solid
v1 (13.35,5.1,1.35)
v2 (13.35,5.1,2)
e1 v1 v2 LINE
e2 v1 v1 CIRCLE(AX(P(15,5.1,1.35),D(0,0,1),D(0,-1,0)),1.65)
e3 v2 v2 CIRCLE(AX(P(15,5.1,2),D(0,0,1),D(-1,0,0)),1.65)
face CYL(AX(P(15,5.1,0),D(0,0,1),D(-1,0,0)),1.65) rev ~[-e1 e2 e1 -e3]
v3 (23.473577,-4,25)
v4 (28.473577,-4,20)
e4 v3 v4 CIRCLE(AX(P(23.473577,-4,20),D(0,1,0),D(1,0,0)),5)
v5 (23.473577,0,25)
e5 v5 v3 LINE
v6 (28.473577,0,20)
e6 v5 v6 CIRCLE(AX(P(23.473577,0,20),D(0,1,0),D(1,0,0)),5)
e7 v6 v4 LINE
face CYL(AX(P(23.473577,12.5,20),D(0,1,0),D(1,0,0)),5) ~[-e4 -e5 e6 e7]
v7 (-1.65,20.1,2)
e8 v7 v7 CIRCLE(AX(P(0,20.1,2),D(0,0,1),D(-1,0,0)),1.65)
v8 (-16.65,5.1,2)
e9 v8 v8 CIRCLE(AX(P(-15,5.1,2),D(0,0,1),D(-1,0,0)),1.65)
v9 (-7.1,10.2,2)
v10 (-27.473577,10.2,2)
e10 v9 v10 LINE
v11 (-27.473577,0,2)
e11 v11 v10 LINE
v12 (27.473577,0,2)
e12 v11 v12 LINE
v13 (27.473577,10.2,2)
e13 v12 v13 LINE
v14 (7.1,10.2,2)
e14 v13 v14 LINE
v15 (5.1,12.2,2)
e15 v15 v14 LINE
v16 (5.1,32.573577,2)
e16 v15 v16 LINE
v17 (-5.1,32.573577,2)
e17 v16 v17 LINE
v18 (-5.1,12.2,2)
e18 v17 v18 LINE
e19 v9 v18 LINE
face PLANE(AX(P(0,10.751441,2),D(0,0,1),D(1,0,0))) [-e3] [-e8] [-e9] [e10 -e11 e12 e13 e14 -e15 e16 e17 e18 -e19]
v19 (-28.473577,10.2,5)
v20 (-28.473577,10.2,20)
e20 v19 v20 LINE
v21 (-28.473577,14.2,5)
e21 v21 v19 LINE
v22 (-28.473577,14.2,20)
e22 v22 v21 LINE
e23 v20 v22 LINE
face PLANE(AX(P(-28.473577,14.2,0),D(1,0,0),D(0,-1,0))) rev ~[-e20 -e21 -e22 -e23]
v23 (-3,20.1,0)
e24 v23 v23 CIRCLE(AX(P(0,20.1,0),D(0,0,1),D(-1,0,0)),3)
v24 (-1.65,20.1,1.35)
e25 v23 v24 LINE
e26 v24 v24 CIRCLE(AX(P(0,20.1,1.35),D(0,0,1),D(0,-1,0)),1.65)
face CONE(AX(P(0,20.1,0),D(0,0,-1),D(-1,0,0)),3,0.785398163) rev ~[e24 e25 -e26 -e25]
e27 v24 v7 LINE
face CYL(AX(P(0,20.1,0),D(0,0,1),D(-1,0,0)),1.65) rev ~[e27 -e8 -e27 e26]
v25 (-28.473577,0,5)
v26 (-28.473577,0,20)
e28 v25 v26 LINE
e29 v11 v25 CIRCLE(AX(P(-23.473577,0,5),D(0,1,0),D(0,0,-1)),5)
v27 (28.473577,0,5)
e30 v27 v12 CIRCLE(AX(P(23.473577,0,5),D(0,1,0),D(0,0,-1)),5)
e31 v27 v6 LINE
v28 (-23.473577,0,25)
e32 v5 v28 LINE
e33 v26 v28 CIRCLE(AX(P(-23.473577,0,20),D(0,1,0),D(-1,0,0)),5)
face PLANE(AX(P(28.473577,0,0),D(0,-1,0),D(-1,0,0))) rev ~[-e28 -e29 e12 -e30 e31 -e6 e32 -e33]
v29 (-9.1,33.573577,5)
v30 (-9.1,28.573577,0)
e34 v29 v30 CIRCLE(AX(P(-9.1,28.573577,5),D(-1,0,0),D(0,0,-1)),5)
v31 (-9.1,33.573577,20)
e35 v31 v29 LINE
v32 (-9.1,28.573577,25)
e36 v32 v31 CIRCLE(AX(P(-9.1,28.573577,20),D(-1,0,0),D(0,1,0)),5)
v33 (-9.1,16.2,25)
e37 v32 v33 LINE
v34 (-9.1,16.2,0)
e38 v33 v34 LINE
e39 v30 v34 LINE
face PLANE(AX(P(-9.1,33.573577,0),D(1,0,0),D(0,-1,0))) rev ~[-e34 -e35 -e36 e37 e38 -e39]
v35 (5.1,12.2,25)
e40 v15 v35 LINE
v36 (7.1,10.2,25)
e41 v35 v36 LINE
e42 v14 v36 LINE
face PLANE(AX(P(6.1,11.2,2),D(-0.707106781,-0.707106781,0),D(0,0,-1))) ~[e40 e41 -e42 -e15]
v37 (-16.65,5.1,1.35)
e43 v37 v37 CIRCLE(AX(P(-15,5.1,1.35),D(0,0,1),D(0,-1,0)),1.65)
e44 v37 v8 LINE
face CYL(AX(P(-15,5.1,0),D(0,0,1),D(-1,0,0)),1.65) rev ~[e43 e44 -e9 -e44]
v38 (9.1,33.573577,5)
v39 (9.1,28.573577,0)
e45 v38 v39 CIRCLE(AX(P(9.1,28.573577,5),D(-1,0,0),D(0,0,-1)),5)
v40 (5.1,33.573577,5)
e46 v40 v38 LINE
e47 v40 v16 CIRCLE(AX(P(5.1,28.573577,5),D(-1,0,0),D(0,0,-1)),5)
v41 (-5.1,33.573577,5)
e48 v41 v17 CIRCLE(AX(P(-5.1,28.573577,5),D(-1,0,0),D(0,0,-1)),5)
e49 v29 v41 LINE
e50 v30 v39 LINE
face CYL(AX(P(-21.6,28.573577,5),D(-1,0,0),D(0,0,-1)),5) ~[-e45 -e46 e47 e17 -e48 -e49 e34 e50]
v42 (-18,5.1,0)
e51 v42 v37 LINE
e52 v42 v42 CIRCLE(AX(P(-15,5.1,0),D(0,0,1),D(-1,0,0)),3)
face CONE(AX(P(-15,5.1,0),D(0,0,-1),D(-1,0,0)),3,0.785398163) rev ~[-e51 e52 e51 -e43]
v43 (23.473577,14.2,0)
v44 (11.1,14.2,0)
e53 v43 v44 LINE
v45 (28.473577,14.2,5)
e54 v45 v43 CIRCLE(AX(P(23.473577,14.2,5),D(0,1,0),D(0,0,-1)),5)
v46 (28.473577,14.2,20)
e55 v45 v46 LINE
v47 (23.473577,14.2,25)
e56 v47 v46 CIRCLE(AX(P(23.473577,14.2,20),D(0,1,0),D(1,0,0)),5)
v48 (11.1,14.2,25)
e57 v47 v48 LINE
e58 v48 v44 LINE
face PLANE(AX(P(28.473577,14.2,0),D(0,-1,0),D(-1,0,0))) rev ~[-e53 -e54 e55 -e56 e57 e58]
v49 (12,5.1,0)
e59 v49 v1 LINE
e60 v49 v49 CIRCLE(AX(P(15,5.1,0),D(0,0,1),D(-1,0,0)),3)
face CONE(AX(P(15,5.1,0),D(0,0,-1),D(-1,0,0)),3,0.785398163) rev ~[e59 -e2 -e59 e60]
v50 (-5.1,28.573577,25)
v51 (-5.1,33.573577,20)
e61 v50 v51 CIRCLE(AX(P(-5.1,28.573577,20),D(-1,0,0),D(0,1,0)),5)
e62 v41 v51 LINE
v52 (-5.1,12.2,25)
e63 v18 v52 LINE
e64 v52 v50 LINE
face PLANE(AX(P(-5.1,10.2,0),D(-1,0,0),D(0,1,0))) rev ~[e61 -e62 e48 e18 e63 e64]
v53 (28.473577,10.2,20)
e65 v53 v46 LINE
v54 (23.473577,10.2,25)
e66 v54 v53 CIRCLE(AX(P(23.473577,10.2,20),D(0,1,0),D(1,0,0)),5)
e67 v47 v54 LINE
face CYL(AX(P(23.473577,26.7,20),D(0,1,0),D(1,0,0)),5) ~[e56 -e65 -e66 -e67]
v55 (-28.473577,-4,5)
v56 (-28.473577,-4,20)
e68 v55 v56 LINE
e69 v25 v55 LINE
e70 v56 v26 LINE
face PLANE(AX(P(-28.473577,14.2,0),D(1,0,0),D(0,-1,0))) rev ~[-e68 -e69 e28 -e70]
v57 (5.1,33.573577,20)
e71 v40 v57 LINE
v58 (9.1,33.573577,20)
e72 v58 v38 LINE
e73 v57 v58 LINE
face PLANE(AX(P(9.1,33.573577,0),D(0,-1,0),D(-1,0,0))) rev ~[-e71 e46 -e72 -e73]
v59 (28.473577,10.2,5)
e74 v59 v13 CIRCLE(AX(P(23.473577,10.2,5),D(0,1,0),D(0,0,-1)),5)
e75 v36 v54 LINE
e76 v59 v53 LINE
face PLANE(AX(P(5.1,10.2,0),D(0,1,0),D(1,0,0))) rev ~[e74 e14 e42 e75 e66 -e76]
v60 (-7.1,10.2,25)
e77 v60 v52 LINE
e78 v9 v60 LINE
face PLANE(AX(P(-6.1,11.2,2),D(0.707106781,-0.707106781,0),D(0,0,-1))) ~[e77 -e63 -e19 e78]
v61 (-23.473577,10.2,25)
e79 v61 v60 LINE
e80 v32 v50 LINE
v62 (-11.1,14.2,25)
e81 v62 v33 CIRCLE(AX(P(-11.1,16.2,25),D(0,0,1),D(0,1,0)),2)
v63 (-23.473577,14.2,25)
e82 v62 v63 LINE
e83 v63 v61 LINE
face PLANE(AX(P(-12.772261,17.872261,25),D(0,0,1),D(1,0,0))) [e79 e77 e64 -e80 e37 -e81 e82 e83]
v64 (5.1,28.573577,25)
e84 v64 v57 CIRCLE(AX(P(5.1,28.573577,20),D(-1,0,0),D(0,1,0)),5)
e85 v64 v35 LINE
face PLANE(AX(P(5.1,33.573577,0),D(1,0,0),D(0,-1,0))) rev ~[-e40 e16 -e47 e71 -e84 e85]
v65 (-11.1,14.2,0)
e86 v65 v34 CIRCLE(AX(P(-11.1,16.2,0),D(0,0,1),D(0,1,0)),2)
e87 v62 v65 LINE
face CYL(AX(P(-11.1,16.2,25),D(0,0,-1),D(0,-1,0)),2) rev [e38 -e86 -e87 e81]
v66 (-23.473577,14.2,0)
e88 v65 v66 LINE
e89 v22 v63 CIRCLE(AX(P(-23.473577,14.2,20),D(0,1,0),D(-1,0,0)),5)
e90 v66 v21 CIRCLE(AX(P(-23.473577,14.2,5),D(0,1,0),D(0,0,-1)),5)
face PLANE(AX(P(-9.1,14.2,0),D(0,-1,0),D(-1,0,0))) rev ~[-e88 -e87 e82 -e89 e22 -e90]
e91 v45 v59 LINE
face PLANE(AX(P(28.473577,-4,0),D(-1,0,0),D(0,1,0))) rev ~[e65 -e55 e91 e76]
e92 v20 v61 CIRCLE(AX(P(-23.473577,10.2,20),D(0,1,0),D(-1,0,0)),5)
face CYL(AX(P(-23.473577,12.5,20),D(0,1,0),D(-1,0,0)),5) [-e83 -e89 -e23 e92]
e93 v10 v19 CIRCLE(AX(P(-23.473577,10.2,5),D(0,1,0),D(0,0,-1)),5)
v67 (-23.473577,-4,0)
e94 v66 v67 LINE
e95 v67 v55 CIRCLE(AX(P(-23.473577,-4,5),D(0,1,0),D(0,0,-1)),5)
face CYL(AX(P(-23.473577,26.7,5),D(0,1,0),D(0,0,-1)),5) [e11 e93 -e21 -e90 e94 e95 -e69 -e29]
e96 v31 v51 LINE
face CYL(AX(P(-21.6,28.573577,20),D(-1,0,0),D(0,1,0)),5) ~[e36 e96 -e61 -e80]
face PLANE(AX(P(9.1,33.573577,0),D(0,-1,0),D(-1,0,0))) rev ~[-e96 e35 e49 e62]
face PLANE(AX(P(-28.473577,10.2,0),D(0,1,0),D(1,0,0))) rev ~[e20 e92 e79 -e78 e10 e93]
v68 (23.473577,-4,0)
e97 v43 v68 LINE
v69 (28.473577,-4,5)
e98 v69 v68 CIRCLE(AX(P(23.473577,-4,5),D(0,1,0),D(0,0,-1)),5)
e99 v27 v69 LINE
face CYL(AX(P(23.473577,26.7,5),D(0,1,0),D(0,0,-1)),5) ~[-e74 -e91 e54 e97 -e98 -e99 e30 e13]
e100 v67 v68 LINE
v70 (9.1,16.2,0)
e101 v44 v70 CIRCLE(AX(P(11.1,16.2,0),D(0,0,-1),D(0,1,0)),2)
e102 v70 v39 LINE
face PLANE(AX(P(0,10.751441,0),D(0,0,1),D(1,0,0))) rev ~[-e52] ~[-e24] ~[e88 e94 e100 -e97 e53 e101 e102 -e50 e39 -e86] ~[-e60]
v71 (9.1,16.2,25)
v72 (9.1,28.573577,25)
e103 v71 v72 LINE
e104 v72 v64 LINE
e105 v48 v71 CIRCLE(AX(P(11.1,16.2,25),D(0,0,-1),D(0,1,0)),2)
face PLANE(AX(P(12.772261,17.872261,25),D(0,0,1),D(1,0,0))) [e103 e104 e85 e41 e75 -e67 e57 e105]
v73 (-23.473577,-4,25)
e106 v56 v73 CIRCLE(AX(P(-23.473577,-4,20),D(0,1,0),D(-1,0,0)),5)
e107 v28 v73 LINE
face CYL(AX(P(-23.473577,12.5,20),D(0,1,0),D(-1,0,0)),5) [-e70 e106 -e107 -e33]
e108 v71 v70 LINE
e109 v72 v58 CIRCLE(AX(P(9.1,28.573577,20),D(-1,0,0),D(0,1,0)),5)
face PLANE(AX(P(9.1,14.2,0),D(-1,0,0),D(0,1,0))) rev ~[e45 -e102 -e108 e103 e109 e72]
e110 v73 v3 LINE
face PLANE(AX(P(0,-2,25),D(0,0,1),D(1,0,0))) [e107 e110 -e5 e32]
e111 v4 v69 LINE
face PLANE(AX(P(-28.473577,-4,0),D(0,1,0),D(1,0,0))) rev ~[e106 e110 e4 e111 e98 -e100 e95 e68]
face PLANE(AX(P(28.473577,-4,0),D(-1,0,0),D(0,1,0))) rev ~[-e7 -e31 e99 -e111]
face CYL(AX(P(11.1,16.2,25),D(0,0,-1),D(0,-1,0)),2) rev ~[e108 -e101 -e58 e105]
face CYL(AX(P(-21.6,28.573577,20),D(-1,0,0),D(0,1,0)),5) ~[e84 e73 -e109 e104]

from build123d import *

# Parameters (mm, degrees)
F1_DEPTH       = 2
F2_DEPTH       = 25
F3_R           = 2
F4_T1_DEPTH    = 29
F4_T3_DEPTH    = 29
F4_T5_DEPTH    = 29
F4_T7_DEPTH    = 29
F4_T9_DEPTH    = 43.2
F4_T11_DEPTH   = 43.2
F5_R           = 2
F6_SIZE        = 2
F8_D           = 3.3
F8_CSINK_D     = 6
F8_CSINK_ANGLE = 90


# Not quite as in the source:
# - a fillet or chamfer that OpenCascade refuses, or shapes differently, is made with other operations: its cross-section is extruded or revolved along the edge and cut away or added


with BuildPart() as f1:
    # F0 (on Top) → F1 (new body)
    with BuildSketch(Plane.XY):
        Polygon((-28.4735770881, 0), (0, 0), (28.4735770881, 0), (28.4735770881, 10.2), (5.1, 10.2), (5.1, 33.5735770881), (-5.1, 33.5735770881), (-5.1, 10.2), (-28.4735770881, 10.2), align=None)
        Polygon((28.4735770881, 0), (0, 0), (-28.4735770881, 0), (-28.4735770881, -4), (0, -4), (28.4735770881, -4), align=None)
        Polygon((5.1, 10.2), (28.4735770881, 10.2), (28.4735770881, 14.2), (9.1, 14.2), (9.1, 33.5735770881), (5.1, 33.5735770881), align=None)
        Polygon((-28.4735770881, 14.2), (-28.4735770881, 10.2), (-5.1, 10.2), (-5.1, 33.5735770881), (-9.1, 33.5735770881), (-9.1, 14.2), align=None)
    extrude(amount=F1_DEPTH)

    # F0 (on Top) → F2 (join)
    with BuildSketch(Plane.XY):
        Polygon((-28.4735770881, 14.2), (-28.4735770881, 10.2), (-5.1, 10.2), (-5.1, 33.5735770881), (-9.1, 33.5735770881), (-9.1, 14.2), align=None)
        Polygon((5.1, 10.2), (28.4735770881, 10.2), (28.4735770881, 14.2), (9.1, 14.2), (9.1, 33.5735770881), (5.1, 33.5735770881), align=None)
        Polygon((28.4735770881, 0), (0, 0), (-28.4735770881, 0), (-28.4735770881, -4), (0, -4), (28.4735770881, -4), align=None)
    extrude(amount=F2_DEPTH)

    # F3
    f3_edges = [f1.edges().sort_by_distance(p)[0] for p in [
        (9.1, 14.2, 12.5),
    ]]
    fillet(f3_edges, radius=F3_R)

    # F4: fillet of radius 5 on 9 edges, made by hand

    # F4_s2 → F4_t1 (cut)
    with BuildSketch(Plane.XZ.offset(-12.5)):
        with BuildLine():
            ThreePointArc((28.4735770881, 20), (27.0091109941, 23.5355339059), (23.4735770881, 25))
            Line((23.4735770881, 25), (28.4735770881, 25))
            Line((28.4735770881, 25), (28.4735770881, 20))
        make_face()
        with BuildLine():
            ThreePointArc((-28.4735770881, 20), (-27.0091109941, 23.5355339059), (-23.4735770881, 25))
            Line((-23.4735770881, 25), (-28.4735770881, 25))
            Line((-28.4735770881, 25), (-28.4735770881, 20))
        make_face()
    extrude(amount=F4_T1_DEPTH, mode=Mode.SUBTRACT)

    # F4_s4 → F4_t3 (cut)
    with BuildSketch(Plane.XZ.offset(-26.7)):
        with BuildLine():
            ThreePointArc((28.4735770881, 20), (27.0091109941, 23.5355339059), (23.4735770881, 25))
            Line((23.4735770881, 25), (28.4735770881, 25))
            Line((28.4735770881, 25), (28.4735770881, 20))
        make_face()
        with BuildLine():
            ThreePointArc((-28.4735770881, 20), (-27.0091109941, 23.5355339059), (-23.4735770881, 25))
            Line((-23.4735770881, 25), (-28.4735770881, 25))
            Line((-28.4735770881, 25), (-28.4735770881, 20))
        make_face()
    extrude(amount=F4_T3_DEPTH, mode=Mode.SUBTRACT)

    # F4_s6 → F4_t5 (cut)
    with BuildSketch(Plane.YZ.offset(-21.6)):
        with BuildLine():
            ThreePointArc((33.5735770881, 20), (32.1091109941, 23.5355339059), (28.5735770881, 25))
            Line((28.5735770881, 25), (33.5735770881, 25))
            Line((33.5735770881, 25), (33.5735770881, 20))
        make_face()
    extrude(amount=F4_T5_DEPTH, mode=Mode.SUBTRACT)

    # F4_s8 → F4_t7 (cut)
    with BuildSketch(Plane.YZ.offset(-7.4)):
        with BuildLine():
            ThreePointArc((33.5735770881, 20), (32.1091109941, 23.5355339059), (28.5735770881, 25))
            Line((28.5735770881, 25), (33.5735770881, 25))
            Line((33.5735770881, 25), (33.5735770881, 20))
        make_face()
    extrude(amount=F4_T7_DEPTH, mode=Mode.SUBTRACT)

    # F4_s10 → F4_t9 (cut)
    with BuildSketch(Plane.XZ.offset(-26.7)):
        with BuildLine():
            ThreePointArc((-23.4735770881, 0), (-27.0091109941, 1.4644660941), (-28.4735770881, 5))
            Line((-28.4735770881, 5), (-28.4735770881, 0))
            Line((-28.4735770881, 0), (-23.4735770881, 0))
        make_face()
        with BuildLine():
            ThreePointArc((23.4735770881, 0), (27.0091109941, 1.4644660941), (28.4735770881, 5))
            Line((28.4735770881, 5), (28.4735770881, 0))
            Line((28.4735770881, 0), (23.4735770881, 0))
        make_face()
    extrude(amount=F4_T9_DEPTH, mode=Mode.SUBTRACT)

    # F4_s12 → F4_t11 (cut)
    with BuildSketch(Plane.YZ.offset(-21.6)):
        with BuildLine():
            ThreePointArc((28.5735770881, 0), (32.1091109941, 1.4644660941), (33.5735770881, 5))
            Line((33.5735770881, 5), (33.5735770881, 0))
            Line((33.5735770881, 0), (28.5735770881, 0))
        make_face()
    extrude(amount=F4_T11_DEPTH, mode=Mode.SUBTRACT)

    # F5
    f5_edges = [f1.edges().sort_by_distance(p)[0] for p in [
        (-9.1, 14.2, 12.5),
    ]]
    fillet(f5_edges, radius=F5_R)

    # F6
    f6_edges = [f1.edges().sort_by_distance(p)[0] for p in [
        (5.1, 10.2, 13.5),
        (-5.1, 10.2, 13.5),
    ]]
    chamfer(f6_edges, length=F6_SIZE)

    # F8 (through all)
    with Locations(Plane(origin=(0, 0, 0), x_dir=(1, 0, 0), z_dir=(0, 0, -1))):
        with Locations((-15, -5.1), (0, -20.1), (15, -5.1)):
            CounterSinkHole(F8_D / 2, F8_CSINK_D / 2, counter_sink_angle=F8_CSINK_ANGLE)


solid = f1.part
